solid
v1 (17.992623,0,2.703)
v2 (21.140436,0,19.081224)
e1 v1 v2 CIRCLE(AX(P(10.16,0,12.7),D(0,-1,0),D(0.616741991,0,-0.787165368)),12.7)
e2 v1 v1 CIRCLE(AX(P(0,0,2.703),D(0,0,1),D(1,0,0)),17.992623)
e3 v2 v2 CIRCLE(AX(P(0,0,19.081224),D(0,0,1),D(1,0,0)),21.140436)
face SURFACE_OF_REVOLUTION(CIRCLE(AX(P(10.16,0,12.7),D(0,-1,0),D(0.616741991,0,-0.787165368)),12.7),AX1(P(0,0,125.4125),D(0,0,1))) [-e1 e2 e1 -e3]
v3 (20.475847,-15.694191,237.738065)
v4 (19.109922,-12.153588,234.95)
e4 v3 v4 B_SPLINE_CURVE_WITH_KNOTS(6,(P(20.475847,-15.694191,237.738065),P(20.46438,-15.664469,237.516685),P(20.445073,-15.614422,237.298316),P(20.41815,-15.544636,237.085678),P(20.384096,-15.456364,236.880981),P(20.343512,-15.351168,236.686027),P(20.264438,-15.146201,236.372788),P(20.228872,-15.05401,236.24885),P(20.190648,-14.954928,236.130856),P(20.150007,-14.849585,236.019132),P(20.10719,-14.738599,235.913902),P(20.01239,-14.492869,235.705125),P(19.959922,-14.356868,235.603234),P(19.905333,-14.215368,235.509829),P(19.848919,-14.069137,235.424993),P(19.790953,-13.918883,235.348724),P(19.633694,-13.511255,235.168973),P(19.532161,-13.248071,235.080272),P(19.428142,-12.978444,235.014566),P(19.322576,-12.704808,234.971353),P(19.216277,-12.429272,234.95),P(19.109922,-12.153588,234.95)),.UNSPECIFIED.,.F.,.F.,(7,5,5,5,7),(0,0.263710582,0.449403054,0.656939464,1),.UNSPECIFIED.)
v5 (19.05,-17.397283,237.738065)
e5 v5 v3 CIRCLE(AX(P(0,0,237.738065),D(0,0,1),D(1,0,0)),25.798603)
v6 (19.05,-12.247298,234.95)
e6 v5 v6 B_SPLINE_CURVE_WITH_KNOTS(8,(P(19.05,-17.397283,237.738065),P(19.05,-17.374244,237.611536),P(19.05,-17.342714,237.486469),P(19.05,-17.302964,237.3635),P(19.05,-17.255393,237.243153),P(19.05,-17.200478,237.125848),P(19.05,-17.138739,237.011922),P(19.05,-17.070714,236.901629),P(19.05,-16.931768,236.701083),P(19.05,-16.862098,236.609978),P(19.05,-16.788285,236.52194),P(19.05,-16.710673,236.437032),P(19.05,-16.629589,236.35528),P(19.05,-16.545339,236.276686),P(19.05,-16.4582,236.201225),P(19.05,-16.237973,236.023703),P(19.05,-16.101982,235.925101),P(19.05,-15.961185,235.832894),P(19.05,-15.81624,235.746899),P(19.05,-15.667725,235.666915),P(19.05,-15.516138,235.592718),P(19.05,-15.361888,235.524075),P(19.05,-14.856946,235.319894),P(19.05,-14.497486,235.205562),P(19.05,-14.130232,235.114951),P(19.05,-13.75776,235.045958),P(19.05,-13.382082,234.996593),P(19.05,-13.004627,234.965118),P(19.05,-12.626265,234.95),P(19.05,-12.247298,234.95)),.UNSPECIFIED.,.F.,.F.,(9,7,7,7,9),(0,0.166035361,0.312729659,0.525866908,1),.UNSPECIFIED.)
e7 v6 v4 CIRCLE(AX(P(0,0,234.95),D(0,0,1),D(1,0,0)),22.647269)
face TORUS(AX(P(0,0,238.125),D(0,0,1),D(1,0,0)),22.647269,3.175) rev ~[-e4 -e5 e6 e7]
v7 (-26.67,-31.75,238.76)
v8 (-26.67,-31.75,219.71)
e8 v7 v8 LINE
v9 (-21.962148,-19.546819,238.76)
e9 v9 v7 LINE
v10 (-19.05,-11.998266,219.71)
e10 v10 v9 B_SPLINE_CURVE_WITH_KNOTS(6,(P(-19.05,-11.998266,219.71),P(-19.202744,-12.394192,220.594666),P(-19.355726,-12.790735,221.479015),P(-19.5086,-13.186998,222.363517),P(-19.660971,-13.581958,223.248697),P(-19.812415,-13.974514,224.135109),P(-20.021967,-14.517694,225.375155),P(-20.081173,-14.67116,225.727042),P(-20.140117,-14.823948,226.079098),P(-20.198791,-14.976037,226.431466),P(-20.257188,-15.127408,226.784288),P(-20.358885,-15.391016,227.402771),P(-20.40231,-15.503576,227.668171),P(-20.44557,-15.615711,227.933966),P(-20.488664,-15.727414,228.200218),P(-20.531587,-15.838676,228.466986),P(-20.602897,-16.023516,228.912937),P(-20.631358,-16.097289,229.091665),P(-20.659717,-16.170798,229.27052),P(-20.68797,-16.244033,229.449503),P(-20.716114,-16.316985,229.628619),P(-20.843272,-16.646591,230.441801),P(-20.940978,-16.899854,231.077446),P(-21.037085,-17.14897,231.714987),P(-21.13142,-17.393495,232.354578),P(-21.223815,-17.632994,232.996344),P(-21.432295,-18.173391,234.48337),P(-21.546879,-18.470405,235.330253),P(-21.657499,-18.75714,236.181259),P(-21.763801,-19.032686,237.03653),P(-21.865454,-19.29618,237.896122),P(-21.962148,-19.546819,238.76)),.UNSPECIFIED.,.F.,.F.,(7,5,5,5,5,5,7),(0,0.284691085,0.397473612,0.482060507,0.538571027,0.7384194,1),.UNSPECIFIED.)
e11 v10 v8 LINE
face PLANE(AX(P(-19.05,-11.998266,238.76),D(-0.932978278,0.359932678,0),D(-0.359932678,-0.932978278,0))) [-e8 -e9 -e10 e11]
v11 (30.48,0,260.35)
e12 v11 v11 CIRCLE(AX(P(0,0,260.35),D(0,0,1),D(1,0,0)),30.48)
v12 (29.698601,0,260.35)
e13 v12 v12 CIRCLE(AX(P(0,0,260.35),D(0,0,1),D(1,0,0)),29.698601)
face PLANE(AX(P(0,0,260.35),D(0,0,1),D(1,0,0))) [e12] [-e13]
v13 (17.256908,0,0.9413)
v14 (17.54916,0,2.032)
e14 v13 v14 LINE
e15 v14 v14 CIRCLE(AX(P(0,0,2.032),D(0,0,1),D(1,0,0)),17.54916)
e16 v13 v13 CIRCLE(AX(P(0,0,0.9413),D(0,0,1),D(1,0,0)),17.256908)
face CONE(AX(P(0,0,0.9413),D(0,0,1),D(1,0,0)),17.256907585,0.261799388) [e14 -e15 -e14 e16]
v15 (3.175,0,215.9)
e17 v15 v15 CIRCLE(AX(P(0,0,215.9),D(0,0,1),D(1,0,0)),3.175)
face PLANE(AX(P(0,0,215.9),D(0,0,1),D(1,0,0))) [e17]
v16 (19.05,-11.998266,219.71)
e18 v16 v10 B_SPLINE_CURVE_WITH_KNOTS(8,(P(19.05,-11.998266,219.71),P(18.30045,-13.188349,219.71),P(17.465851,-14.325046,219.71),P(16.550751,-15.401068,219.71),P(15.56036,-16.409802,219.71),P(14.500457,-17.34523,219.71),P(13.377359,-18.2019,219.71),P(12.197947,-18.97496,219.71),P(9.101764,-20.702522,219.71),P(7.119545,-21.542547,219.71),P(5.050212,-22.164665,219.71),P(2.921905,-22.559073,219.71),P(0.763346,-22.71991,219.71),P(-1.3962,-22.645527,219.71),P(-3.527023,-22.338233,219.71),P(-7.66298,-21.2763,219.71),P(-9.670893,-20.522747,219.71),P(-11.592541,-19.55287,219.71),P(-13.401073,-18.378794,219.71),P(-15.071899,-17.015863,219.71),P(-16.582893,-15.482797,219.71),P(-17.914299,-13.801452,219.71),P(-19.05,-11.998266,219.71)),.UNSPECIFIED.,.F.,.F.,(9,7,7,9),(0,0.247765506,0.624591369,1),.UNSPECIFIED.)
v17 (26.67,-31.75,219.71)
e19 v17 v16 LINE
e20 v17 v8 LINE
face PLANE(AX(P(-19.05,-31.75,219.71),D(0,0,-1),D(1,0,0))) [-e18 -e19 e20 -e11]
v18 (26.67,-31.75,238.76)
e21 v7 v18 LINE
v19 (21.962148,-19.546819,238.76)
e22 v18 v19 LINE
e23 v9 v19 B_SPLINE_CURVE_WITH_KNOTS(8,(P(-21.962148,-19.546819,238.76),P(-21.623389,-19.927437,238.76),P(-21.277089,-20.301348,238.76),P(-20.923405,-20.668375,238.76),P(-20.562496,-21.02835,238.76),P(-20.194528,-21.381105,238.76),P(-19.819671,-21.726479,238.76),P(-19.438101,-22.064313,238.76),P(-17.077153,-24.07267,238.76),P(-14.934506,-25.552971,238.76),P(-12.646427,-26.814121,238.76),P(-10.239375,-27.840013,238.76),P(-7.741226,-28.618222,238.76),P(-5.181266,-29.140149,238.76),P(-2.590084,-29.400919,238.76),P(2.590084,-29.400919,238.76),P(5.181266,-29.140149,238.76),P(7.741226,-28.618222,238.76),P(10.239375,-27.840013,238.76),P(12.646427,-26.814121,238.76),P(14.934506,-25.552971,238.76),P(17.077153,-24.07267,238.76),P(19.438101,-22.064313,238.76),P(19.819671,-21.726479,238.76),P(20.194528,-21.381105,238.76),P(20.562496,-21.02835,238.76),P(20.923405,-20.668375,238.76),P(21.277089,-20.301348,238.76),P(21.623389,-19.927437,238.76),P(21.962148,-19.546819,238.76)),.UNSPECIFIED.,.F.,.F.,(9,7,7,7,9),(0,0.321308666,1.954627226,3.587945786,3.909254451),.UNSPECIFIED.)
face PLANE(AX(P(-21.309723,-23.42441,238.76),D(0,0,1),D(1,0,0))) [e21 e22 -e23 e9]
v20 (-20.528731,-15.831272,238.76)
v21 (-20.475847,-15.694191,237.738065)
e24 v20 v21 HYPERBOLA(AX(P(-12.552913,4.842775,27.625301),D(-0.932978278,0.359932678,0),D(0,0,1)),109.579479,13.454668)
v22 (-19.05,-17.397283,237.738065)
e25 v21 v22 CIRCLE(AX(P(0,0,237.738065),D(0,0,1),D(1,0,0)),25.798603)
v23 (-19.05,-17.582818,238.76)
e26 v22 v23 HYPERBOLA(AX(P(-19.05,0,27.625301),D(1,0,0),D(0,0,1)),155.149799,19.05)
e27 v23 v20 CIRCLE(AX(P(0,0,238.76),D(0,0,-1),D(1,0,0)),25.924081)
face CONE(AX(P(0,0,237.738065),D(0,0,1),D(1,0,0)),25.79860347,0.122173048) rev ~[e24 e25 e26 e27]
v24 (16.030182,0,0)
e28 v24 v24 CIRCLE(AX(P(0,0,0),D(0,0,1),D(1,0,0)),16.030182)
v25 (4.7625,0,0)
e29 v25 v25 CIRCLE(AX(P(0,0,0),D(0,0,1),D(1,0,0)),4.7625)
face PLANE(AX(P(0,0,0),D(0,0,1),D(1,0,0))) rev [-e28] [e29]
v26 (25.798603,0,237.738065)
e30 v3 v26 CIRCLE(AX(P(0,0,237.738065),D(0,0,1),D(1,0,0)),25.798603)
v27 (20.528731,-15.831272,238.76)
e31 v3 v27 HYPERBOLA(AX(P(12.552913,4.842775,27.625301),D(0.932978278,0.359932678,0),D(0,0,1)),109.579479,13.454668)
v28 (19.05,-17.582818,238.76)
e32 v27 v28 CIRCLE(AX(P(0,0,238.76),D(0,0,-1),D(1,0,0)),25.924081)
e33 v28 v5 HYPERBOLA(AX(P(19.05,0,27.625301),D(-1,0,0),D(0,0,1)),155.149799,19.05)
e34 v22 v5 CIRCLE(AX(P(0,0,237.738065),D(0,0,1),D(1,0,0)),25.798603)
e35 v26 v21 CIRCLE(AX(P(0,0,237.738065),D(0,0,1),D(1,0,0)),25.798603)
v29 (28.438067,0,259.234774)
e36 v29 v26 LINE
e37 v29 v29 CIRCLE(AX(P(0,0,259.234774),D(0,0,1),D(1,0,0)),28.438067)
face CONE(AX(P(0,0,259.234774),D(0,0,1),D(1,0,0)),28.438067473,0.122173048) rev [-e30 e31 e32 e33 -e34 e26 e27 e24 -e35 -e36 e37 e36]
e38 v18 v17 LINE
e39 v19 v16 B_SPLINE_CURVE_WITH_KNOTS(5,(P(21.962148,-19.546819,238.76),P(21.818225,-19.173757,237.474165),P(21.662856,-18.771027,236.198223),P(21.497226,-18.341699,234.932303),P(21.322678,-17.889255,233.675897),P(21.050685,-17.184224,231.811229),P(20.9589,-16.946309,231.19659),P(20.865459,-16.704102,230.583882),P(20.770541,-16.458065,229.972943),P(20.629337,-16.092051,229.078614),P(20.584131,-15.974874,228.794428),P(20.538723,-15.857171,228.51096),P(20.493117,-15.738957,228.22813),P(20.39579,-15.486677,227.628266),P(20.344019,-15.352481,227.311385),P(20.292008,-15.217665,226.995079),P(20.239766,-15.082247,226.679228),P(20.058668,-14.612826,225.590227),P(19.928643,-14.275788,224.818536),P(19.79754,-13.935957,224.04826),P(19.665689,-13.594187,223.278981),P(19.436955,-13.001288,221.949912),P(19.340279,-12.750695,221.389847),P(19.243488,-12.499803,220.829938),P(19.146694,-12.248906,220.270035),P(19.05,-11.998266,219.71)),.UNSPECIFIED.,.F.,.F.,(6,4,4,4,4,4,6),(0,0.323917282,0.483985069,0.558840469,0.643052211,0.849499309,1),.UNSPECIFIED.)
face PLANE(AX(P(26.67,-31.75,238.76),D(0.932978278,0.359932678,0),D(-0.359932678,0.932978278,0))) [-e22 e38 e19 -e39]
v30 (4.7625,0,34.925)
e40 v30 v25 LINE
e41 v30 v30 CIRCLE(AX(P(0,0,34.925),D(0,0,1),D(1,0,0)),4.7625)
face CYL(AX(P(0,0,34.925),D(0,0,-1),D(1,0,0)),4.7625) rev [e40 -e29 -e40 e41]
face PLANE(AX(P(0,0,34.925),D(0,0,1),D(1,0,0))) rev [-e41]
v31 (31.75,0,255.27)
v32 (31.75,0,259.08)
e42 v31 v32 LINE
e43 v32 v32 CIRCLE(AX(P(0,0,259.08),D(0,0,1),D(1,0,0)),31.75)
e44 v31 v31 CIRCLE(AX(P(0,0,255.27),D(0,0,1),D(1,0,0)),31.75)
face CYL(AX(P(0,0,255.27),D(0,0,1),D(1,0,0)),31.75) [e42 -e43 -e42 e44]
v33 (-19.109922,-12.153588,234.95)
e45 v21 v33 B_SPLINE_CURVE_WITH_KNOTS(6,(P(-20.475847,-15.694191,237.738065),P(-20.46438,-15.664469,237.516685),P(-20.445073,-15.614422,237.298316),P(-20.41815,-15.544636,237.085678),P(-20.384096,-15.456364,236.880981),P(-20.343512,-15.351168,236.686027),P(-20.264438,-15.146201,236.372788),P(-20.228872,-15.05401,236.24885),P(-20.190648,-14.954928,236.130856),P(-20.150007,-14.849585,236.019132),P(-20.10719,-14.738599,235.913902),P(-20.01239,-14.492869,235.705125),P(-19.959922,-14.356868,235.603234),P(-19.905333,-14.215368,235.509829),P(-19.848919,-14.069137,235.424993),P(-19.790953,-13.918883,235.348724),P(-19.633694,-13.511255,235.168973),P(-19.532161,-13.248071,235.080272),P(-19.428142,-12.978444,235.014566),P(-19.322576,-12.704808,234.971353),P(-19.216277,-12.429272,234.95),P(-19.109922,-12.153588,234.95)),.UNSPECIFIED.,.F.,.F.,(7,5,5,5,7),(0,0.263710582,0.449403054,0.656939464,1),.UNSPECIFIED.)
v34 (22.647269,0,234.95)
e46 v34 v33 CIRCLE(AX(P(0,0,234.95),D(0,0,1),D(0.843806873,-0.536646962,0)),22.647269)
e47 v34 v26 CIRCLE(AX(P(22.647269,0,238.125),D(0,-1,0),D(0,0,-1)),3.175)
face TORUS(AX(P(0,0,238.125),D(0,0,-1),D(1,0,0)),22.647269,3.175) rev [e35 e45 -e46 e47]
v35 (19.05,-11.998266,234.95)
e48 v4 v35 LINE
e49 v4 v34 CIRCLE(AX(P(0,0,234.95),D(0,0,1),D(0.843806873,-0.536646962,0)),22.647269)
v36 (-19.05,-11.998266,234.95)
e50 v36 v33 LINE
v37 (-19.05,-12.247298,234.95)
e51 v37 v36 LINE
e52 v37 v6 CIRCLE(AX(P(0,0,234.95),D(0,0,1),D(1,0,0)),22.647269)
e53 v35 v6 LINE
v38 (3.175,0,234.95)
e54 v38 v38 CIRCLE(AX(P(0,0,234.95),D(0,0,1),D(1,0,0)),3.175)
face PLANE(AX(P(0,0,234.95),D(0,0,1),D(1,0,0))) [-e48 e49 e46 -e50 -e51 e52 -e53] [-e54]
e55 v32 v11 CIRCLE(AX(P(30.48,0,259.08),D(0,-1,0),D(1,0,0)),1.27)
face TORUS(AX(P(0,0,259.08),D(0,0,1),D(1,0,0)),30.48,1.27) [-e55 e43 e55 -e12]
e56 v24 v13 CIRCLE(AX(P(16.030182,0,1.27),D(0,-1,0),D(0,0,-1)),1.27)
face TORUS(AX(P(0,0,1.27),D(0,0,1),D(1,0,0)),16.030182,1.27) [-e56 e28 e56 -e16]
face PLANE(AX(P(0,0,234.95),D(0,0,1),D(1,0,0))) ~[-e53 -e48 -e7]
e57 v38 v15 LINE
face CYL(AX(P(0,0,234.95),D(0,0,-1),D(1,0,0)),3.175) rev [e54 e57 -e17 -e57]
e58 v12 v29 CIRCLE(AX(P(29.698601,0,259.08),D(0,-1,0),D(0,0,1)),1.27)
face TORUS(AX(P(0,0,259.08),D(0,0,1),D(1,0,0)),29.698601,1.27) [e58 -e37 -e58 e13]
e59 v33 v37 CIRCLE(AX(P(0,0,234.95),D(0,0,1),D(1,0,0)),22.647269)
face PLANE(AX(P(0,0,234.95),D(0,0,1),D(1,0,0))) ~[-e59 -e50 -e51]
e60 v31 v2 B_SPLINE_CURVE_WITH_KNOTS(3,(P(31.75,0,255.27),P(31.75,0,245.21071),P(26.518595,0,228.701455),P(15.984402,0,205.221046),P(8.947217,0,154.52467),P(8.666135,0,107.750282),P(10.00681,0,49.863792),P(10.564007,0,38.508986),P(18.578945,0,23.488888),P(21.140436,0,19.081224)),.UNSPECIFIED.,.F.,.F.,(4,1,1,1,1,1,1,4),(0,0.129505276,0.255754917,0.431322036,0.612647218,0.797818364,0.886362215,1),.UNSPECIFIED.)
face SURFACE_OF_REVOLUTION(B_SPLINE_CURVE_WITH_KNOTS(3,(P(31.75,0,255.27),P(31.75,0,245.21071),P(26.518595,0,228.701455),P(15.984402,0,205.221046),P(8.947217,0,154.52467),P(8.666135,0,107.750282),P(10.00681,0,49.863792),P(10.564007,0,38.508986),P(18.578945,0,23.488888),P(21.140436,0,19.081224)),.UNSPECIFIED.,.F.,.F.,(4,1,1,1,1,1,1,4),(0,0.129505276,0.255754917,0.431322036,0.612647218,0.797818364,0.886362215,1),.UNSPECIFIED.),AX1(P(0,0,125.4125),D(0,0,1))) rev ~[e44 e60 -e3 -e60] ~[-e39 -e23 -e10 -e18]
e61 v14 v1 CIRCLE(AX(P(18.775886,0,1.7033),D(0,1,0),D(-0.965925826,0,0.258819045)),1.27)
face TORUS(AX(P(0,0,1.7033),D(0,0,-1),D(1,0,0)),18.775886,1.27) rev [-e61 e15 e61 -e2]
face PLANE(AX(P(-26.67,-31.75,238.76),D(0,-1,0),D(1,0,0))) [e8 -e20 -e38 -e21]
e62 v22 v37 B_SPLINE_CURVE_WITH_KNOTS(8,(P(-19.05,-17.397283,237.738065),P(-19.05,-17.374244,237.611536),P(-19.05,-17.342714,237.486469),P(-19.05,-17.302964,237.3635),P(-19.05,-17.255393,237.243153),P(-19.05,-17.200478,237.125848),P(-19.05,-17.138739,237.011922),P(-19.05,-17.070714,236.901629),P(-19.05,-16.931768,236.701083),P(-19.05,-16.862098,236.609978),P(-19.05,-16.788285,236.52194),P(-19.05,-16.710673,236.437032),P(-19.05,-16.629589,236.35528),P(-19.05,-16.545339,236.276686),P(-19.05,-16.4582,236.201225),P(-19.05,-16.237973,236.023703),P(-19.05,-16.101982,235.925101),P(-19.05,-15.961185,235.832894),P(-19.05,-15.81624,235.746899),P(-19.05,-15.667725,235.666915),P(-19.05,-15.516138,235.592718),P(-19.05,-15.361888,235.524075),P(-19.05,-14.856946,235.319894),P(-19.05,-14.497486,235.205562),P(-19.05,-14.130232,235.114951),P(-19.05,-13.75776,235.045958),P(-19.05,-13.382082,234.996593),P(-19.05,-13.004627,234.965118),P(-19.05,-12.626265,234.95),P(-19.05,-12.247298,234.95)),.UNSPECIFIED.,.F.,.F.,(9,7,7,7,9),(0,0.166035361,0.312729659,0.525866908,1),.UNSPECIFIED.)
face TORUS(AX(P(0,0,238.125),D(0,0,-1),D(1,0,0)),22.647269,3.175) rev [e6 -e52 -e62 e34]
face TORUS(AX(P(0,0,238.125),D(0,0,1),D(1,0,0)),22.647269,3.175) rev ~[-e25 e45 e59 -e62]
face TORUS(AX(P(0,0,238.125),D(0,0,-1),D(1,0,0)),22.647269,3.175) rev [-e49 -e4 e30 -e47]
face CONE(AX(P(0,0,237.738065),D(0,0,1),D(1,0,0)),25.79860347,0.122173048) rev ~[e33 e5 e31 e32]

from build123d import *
from build123d import SkipClean  # not in build123d's __all__

# Parameters (mm, degrees)
F3_W     = 38.1
F3_H     = 19.05
F6_DEPTH = 19.05


with BuildPart() as f1:
    # F0 (on Front) → F1 (revolve)
    with BuildSketch(Plane.XZ):
        with BuildLine():
            Line((0, 215.9), (0, 34.925))
            Line((0, 34.925), (4.7625, 34.925))
            Line((4.7625, 34.925), (4.7625, 0))
            Line((4.7625, 0), (16.0301817854, 0))
            ThreePointArc((16.0301817854, 0), (16.8033088002, 0.2624412578), (17.2569075847, 0.9412998127))
            Line((17.2569075847, 0.9412998127), (17.5491598191, 2.032))
            ThreePointArc((17.5491598191, 2.032), (17.7163700396, 2.4035331582), (17.9926232895, 2.7029998297))
            ThreePointArc((17.9926232895, 2.7029998297), (22.6317424543, 10.3029935013), (21.1404360837, 19.0812242878))
            add(Edge.make_bspline(
                [(31.75, 255.27), (31.75, 245.2107101672), (26.5185945183, 228.7014550673), (15.9844015161, 205.2210464666), (8.947216643, 154.5246702551), (8.6661346378, 107.7502824908), (10.0068103161, 49.8637921648), (10.5640065806, 38.5089857021), (18.5789449872, 23.4888877699), (21.1404360837, 19.0812242878)],
                knots=[0, 0, 0, 0, 0.129505276, 0.2557549168, 0.4313220358, 0.6126472182, 0.7978183645, 0.8863622153, 1, 1, 1, 1], degree=3))
            Line((31.75, 255.27), (31.75, 259.08))
            ThreePointArc((31.75, 259.08), (31.3780256121, 259.9780256121), (30.48, 260.35))
            Line((30.48, 260.35), (29.698601086, 260.35))
            ThreePointArc((29.698601086, 260.35), (28.8570736248, 260.0311737654), (28.4380674734, 259.2347740661))
            Line((28.4380674734, 259.2347740661), (25.7986034696, 237.7380648347))
            ThreePointArc((25.7986034696, 237.7380648347), (24.7510880912, 235.7470655865), (22.6472694381, 234.95))
            Line((22.6472694381, 234.95), (3.175, 234.95))
            Line((3.175, 234.95), (3.175, 215.9))
            Line((3.175, 215.9), (0, 215.9))
        make_face()
    revolve(axis=Axis((0, 0, 125.4125), (0, 0, 1)))

    # F3 (on offset) → F4 (join, up to the next surface of F1)
    with BuildSketch(Plane.XZ.offset(31.75)):
        with Locations((0, 229.235)):
            Rectangle(F3_W, F3_H)
    extrude(until=Until.NEXT, dir=(0, 1, 0))

    # F5 (on face) → F6 (join, through all)
    with BuildSketch(Plane.XY.offset(238.76)):
        Polygon((19.05, -11.9982660867), (19.05, -31.75), (26.67, -31.75), align=None)
        Polygon((-19.05, -11.9982660867), (-26.67, -31.75), (-19.05, -31.75), align=None)
    extrude(amount=-F6_DEPTH)

    # F7 (on Front) → F8 (revolve, cut)
    with BuildSketch(Plane.XZ):
        with BuildLine():
            Line((25.7986034696, 237.7380648347), (28.9941972857, 263.7640879161))
            Line((28.9941972857, 263.7640879161), (0, 263.7158632278))
            Line((0, 263.7158632278), (0, 234.95))
            Line((0, 234.95), (22.6472694381, 234.95))
            ThreePointArc((22.6472694381, 234.95), (24.7510880912, 235.7470655865), (25.7986034696, 237.7380648347))
        make_face()
    with SkipClean():  # cleaning this boolean's faces spoils the solid; the shape is the same uncleaned
        revolve(axis=Axis((0, 0, 155.8669472579), (0, 0, 1)), mode=Mode.SUBTRACT)


solid = f1.part
